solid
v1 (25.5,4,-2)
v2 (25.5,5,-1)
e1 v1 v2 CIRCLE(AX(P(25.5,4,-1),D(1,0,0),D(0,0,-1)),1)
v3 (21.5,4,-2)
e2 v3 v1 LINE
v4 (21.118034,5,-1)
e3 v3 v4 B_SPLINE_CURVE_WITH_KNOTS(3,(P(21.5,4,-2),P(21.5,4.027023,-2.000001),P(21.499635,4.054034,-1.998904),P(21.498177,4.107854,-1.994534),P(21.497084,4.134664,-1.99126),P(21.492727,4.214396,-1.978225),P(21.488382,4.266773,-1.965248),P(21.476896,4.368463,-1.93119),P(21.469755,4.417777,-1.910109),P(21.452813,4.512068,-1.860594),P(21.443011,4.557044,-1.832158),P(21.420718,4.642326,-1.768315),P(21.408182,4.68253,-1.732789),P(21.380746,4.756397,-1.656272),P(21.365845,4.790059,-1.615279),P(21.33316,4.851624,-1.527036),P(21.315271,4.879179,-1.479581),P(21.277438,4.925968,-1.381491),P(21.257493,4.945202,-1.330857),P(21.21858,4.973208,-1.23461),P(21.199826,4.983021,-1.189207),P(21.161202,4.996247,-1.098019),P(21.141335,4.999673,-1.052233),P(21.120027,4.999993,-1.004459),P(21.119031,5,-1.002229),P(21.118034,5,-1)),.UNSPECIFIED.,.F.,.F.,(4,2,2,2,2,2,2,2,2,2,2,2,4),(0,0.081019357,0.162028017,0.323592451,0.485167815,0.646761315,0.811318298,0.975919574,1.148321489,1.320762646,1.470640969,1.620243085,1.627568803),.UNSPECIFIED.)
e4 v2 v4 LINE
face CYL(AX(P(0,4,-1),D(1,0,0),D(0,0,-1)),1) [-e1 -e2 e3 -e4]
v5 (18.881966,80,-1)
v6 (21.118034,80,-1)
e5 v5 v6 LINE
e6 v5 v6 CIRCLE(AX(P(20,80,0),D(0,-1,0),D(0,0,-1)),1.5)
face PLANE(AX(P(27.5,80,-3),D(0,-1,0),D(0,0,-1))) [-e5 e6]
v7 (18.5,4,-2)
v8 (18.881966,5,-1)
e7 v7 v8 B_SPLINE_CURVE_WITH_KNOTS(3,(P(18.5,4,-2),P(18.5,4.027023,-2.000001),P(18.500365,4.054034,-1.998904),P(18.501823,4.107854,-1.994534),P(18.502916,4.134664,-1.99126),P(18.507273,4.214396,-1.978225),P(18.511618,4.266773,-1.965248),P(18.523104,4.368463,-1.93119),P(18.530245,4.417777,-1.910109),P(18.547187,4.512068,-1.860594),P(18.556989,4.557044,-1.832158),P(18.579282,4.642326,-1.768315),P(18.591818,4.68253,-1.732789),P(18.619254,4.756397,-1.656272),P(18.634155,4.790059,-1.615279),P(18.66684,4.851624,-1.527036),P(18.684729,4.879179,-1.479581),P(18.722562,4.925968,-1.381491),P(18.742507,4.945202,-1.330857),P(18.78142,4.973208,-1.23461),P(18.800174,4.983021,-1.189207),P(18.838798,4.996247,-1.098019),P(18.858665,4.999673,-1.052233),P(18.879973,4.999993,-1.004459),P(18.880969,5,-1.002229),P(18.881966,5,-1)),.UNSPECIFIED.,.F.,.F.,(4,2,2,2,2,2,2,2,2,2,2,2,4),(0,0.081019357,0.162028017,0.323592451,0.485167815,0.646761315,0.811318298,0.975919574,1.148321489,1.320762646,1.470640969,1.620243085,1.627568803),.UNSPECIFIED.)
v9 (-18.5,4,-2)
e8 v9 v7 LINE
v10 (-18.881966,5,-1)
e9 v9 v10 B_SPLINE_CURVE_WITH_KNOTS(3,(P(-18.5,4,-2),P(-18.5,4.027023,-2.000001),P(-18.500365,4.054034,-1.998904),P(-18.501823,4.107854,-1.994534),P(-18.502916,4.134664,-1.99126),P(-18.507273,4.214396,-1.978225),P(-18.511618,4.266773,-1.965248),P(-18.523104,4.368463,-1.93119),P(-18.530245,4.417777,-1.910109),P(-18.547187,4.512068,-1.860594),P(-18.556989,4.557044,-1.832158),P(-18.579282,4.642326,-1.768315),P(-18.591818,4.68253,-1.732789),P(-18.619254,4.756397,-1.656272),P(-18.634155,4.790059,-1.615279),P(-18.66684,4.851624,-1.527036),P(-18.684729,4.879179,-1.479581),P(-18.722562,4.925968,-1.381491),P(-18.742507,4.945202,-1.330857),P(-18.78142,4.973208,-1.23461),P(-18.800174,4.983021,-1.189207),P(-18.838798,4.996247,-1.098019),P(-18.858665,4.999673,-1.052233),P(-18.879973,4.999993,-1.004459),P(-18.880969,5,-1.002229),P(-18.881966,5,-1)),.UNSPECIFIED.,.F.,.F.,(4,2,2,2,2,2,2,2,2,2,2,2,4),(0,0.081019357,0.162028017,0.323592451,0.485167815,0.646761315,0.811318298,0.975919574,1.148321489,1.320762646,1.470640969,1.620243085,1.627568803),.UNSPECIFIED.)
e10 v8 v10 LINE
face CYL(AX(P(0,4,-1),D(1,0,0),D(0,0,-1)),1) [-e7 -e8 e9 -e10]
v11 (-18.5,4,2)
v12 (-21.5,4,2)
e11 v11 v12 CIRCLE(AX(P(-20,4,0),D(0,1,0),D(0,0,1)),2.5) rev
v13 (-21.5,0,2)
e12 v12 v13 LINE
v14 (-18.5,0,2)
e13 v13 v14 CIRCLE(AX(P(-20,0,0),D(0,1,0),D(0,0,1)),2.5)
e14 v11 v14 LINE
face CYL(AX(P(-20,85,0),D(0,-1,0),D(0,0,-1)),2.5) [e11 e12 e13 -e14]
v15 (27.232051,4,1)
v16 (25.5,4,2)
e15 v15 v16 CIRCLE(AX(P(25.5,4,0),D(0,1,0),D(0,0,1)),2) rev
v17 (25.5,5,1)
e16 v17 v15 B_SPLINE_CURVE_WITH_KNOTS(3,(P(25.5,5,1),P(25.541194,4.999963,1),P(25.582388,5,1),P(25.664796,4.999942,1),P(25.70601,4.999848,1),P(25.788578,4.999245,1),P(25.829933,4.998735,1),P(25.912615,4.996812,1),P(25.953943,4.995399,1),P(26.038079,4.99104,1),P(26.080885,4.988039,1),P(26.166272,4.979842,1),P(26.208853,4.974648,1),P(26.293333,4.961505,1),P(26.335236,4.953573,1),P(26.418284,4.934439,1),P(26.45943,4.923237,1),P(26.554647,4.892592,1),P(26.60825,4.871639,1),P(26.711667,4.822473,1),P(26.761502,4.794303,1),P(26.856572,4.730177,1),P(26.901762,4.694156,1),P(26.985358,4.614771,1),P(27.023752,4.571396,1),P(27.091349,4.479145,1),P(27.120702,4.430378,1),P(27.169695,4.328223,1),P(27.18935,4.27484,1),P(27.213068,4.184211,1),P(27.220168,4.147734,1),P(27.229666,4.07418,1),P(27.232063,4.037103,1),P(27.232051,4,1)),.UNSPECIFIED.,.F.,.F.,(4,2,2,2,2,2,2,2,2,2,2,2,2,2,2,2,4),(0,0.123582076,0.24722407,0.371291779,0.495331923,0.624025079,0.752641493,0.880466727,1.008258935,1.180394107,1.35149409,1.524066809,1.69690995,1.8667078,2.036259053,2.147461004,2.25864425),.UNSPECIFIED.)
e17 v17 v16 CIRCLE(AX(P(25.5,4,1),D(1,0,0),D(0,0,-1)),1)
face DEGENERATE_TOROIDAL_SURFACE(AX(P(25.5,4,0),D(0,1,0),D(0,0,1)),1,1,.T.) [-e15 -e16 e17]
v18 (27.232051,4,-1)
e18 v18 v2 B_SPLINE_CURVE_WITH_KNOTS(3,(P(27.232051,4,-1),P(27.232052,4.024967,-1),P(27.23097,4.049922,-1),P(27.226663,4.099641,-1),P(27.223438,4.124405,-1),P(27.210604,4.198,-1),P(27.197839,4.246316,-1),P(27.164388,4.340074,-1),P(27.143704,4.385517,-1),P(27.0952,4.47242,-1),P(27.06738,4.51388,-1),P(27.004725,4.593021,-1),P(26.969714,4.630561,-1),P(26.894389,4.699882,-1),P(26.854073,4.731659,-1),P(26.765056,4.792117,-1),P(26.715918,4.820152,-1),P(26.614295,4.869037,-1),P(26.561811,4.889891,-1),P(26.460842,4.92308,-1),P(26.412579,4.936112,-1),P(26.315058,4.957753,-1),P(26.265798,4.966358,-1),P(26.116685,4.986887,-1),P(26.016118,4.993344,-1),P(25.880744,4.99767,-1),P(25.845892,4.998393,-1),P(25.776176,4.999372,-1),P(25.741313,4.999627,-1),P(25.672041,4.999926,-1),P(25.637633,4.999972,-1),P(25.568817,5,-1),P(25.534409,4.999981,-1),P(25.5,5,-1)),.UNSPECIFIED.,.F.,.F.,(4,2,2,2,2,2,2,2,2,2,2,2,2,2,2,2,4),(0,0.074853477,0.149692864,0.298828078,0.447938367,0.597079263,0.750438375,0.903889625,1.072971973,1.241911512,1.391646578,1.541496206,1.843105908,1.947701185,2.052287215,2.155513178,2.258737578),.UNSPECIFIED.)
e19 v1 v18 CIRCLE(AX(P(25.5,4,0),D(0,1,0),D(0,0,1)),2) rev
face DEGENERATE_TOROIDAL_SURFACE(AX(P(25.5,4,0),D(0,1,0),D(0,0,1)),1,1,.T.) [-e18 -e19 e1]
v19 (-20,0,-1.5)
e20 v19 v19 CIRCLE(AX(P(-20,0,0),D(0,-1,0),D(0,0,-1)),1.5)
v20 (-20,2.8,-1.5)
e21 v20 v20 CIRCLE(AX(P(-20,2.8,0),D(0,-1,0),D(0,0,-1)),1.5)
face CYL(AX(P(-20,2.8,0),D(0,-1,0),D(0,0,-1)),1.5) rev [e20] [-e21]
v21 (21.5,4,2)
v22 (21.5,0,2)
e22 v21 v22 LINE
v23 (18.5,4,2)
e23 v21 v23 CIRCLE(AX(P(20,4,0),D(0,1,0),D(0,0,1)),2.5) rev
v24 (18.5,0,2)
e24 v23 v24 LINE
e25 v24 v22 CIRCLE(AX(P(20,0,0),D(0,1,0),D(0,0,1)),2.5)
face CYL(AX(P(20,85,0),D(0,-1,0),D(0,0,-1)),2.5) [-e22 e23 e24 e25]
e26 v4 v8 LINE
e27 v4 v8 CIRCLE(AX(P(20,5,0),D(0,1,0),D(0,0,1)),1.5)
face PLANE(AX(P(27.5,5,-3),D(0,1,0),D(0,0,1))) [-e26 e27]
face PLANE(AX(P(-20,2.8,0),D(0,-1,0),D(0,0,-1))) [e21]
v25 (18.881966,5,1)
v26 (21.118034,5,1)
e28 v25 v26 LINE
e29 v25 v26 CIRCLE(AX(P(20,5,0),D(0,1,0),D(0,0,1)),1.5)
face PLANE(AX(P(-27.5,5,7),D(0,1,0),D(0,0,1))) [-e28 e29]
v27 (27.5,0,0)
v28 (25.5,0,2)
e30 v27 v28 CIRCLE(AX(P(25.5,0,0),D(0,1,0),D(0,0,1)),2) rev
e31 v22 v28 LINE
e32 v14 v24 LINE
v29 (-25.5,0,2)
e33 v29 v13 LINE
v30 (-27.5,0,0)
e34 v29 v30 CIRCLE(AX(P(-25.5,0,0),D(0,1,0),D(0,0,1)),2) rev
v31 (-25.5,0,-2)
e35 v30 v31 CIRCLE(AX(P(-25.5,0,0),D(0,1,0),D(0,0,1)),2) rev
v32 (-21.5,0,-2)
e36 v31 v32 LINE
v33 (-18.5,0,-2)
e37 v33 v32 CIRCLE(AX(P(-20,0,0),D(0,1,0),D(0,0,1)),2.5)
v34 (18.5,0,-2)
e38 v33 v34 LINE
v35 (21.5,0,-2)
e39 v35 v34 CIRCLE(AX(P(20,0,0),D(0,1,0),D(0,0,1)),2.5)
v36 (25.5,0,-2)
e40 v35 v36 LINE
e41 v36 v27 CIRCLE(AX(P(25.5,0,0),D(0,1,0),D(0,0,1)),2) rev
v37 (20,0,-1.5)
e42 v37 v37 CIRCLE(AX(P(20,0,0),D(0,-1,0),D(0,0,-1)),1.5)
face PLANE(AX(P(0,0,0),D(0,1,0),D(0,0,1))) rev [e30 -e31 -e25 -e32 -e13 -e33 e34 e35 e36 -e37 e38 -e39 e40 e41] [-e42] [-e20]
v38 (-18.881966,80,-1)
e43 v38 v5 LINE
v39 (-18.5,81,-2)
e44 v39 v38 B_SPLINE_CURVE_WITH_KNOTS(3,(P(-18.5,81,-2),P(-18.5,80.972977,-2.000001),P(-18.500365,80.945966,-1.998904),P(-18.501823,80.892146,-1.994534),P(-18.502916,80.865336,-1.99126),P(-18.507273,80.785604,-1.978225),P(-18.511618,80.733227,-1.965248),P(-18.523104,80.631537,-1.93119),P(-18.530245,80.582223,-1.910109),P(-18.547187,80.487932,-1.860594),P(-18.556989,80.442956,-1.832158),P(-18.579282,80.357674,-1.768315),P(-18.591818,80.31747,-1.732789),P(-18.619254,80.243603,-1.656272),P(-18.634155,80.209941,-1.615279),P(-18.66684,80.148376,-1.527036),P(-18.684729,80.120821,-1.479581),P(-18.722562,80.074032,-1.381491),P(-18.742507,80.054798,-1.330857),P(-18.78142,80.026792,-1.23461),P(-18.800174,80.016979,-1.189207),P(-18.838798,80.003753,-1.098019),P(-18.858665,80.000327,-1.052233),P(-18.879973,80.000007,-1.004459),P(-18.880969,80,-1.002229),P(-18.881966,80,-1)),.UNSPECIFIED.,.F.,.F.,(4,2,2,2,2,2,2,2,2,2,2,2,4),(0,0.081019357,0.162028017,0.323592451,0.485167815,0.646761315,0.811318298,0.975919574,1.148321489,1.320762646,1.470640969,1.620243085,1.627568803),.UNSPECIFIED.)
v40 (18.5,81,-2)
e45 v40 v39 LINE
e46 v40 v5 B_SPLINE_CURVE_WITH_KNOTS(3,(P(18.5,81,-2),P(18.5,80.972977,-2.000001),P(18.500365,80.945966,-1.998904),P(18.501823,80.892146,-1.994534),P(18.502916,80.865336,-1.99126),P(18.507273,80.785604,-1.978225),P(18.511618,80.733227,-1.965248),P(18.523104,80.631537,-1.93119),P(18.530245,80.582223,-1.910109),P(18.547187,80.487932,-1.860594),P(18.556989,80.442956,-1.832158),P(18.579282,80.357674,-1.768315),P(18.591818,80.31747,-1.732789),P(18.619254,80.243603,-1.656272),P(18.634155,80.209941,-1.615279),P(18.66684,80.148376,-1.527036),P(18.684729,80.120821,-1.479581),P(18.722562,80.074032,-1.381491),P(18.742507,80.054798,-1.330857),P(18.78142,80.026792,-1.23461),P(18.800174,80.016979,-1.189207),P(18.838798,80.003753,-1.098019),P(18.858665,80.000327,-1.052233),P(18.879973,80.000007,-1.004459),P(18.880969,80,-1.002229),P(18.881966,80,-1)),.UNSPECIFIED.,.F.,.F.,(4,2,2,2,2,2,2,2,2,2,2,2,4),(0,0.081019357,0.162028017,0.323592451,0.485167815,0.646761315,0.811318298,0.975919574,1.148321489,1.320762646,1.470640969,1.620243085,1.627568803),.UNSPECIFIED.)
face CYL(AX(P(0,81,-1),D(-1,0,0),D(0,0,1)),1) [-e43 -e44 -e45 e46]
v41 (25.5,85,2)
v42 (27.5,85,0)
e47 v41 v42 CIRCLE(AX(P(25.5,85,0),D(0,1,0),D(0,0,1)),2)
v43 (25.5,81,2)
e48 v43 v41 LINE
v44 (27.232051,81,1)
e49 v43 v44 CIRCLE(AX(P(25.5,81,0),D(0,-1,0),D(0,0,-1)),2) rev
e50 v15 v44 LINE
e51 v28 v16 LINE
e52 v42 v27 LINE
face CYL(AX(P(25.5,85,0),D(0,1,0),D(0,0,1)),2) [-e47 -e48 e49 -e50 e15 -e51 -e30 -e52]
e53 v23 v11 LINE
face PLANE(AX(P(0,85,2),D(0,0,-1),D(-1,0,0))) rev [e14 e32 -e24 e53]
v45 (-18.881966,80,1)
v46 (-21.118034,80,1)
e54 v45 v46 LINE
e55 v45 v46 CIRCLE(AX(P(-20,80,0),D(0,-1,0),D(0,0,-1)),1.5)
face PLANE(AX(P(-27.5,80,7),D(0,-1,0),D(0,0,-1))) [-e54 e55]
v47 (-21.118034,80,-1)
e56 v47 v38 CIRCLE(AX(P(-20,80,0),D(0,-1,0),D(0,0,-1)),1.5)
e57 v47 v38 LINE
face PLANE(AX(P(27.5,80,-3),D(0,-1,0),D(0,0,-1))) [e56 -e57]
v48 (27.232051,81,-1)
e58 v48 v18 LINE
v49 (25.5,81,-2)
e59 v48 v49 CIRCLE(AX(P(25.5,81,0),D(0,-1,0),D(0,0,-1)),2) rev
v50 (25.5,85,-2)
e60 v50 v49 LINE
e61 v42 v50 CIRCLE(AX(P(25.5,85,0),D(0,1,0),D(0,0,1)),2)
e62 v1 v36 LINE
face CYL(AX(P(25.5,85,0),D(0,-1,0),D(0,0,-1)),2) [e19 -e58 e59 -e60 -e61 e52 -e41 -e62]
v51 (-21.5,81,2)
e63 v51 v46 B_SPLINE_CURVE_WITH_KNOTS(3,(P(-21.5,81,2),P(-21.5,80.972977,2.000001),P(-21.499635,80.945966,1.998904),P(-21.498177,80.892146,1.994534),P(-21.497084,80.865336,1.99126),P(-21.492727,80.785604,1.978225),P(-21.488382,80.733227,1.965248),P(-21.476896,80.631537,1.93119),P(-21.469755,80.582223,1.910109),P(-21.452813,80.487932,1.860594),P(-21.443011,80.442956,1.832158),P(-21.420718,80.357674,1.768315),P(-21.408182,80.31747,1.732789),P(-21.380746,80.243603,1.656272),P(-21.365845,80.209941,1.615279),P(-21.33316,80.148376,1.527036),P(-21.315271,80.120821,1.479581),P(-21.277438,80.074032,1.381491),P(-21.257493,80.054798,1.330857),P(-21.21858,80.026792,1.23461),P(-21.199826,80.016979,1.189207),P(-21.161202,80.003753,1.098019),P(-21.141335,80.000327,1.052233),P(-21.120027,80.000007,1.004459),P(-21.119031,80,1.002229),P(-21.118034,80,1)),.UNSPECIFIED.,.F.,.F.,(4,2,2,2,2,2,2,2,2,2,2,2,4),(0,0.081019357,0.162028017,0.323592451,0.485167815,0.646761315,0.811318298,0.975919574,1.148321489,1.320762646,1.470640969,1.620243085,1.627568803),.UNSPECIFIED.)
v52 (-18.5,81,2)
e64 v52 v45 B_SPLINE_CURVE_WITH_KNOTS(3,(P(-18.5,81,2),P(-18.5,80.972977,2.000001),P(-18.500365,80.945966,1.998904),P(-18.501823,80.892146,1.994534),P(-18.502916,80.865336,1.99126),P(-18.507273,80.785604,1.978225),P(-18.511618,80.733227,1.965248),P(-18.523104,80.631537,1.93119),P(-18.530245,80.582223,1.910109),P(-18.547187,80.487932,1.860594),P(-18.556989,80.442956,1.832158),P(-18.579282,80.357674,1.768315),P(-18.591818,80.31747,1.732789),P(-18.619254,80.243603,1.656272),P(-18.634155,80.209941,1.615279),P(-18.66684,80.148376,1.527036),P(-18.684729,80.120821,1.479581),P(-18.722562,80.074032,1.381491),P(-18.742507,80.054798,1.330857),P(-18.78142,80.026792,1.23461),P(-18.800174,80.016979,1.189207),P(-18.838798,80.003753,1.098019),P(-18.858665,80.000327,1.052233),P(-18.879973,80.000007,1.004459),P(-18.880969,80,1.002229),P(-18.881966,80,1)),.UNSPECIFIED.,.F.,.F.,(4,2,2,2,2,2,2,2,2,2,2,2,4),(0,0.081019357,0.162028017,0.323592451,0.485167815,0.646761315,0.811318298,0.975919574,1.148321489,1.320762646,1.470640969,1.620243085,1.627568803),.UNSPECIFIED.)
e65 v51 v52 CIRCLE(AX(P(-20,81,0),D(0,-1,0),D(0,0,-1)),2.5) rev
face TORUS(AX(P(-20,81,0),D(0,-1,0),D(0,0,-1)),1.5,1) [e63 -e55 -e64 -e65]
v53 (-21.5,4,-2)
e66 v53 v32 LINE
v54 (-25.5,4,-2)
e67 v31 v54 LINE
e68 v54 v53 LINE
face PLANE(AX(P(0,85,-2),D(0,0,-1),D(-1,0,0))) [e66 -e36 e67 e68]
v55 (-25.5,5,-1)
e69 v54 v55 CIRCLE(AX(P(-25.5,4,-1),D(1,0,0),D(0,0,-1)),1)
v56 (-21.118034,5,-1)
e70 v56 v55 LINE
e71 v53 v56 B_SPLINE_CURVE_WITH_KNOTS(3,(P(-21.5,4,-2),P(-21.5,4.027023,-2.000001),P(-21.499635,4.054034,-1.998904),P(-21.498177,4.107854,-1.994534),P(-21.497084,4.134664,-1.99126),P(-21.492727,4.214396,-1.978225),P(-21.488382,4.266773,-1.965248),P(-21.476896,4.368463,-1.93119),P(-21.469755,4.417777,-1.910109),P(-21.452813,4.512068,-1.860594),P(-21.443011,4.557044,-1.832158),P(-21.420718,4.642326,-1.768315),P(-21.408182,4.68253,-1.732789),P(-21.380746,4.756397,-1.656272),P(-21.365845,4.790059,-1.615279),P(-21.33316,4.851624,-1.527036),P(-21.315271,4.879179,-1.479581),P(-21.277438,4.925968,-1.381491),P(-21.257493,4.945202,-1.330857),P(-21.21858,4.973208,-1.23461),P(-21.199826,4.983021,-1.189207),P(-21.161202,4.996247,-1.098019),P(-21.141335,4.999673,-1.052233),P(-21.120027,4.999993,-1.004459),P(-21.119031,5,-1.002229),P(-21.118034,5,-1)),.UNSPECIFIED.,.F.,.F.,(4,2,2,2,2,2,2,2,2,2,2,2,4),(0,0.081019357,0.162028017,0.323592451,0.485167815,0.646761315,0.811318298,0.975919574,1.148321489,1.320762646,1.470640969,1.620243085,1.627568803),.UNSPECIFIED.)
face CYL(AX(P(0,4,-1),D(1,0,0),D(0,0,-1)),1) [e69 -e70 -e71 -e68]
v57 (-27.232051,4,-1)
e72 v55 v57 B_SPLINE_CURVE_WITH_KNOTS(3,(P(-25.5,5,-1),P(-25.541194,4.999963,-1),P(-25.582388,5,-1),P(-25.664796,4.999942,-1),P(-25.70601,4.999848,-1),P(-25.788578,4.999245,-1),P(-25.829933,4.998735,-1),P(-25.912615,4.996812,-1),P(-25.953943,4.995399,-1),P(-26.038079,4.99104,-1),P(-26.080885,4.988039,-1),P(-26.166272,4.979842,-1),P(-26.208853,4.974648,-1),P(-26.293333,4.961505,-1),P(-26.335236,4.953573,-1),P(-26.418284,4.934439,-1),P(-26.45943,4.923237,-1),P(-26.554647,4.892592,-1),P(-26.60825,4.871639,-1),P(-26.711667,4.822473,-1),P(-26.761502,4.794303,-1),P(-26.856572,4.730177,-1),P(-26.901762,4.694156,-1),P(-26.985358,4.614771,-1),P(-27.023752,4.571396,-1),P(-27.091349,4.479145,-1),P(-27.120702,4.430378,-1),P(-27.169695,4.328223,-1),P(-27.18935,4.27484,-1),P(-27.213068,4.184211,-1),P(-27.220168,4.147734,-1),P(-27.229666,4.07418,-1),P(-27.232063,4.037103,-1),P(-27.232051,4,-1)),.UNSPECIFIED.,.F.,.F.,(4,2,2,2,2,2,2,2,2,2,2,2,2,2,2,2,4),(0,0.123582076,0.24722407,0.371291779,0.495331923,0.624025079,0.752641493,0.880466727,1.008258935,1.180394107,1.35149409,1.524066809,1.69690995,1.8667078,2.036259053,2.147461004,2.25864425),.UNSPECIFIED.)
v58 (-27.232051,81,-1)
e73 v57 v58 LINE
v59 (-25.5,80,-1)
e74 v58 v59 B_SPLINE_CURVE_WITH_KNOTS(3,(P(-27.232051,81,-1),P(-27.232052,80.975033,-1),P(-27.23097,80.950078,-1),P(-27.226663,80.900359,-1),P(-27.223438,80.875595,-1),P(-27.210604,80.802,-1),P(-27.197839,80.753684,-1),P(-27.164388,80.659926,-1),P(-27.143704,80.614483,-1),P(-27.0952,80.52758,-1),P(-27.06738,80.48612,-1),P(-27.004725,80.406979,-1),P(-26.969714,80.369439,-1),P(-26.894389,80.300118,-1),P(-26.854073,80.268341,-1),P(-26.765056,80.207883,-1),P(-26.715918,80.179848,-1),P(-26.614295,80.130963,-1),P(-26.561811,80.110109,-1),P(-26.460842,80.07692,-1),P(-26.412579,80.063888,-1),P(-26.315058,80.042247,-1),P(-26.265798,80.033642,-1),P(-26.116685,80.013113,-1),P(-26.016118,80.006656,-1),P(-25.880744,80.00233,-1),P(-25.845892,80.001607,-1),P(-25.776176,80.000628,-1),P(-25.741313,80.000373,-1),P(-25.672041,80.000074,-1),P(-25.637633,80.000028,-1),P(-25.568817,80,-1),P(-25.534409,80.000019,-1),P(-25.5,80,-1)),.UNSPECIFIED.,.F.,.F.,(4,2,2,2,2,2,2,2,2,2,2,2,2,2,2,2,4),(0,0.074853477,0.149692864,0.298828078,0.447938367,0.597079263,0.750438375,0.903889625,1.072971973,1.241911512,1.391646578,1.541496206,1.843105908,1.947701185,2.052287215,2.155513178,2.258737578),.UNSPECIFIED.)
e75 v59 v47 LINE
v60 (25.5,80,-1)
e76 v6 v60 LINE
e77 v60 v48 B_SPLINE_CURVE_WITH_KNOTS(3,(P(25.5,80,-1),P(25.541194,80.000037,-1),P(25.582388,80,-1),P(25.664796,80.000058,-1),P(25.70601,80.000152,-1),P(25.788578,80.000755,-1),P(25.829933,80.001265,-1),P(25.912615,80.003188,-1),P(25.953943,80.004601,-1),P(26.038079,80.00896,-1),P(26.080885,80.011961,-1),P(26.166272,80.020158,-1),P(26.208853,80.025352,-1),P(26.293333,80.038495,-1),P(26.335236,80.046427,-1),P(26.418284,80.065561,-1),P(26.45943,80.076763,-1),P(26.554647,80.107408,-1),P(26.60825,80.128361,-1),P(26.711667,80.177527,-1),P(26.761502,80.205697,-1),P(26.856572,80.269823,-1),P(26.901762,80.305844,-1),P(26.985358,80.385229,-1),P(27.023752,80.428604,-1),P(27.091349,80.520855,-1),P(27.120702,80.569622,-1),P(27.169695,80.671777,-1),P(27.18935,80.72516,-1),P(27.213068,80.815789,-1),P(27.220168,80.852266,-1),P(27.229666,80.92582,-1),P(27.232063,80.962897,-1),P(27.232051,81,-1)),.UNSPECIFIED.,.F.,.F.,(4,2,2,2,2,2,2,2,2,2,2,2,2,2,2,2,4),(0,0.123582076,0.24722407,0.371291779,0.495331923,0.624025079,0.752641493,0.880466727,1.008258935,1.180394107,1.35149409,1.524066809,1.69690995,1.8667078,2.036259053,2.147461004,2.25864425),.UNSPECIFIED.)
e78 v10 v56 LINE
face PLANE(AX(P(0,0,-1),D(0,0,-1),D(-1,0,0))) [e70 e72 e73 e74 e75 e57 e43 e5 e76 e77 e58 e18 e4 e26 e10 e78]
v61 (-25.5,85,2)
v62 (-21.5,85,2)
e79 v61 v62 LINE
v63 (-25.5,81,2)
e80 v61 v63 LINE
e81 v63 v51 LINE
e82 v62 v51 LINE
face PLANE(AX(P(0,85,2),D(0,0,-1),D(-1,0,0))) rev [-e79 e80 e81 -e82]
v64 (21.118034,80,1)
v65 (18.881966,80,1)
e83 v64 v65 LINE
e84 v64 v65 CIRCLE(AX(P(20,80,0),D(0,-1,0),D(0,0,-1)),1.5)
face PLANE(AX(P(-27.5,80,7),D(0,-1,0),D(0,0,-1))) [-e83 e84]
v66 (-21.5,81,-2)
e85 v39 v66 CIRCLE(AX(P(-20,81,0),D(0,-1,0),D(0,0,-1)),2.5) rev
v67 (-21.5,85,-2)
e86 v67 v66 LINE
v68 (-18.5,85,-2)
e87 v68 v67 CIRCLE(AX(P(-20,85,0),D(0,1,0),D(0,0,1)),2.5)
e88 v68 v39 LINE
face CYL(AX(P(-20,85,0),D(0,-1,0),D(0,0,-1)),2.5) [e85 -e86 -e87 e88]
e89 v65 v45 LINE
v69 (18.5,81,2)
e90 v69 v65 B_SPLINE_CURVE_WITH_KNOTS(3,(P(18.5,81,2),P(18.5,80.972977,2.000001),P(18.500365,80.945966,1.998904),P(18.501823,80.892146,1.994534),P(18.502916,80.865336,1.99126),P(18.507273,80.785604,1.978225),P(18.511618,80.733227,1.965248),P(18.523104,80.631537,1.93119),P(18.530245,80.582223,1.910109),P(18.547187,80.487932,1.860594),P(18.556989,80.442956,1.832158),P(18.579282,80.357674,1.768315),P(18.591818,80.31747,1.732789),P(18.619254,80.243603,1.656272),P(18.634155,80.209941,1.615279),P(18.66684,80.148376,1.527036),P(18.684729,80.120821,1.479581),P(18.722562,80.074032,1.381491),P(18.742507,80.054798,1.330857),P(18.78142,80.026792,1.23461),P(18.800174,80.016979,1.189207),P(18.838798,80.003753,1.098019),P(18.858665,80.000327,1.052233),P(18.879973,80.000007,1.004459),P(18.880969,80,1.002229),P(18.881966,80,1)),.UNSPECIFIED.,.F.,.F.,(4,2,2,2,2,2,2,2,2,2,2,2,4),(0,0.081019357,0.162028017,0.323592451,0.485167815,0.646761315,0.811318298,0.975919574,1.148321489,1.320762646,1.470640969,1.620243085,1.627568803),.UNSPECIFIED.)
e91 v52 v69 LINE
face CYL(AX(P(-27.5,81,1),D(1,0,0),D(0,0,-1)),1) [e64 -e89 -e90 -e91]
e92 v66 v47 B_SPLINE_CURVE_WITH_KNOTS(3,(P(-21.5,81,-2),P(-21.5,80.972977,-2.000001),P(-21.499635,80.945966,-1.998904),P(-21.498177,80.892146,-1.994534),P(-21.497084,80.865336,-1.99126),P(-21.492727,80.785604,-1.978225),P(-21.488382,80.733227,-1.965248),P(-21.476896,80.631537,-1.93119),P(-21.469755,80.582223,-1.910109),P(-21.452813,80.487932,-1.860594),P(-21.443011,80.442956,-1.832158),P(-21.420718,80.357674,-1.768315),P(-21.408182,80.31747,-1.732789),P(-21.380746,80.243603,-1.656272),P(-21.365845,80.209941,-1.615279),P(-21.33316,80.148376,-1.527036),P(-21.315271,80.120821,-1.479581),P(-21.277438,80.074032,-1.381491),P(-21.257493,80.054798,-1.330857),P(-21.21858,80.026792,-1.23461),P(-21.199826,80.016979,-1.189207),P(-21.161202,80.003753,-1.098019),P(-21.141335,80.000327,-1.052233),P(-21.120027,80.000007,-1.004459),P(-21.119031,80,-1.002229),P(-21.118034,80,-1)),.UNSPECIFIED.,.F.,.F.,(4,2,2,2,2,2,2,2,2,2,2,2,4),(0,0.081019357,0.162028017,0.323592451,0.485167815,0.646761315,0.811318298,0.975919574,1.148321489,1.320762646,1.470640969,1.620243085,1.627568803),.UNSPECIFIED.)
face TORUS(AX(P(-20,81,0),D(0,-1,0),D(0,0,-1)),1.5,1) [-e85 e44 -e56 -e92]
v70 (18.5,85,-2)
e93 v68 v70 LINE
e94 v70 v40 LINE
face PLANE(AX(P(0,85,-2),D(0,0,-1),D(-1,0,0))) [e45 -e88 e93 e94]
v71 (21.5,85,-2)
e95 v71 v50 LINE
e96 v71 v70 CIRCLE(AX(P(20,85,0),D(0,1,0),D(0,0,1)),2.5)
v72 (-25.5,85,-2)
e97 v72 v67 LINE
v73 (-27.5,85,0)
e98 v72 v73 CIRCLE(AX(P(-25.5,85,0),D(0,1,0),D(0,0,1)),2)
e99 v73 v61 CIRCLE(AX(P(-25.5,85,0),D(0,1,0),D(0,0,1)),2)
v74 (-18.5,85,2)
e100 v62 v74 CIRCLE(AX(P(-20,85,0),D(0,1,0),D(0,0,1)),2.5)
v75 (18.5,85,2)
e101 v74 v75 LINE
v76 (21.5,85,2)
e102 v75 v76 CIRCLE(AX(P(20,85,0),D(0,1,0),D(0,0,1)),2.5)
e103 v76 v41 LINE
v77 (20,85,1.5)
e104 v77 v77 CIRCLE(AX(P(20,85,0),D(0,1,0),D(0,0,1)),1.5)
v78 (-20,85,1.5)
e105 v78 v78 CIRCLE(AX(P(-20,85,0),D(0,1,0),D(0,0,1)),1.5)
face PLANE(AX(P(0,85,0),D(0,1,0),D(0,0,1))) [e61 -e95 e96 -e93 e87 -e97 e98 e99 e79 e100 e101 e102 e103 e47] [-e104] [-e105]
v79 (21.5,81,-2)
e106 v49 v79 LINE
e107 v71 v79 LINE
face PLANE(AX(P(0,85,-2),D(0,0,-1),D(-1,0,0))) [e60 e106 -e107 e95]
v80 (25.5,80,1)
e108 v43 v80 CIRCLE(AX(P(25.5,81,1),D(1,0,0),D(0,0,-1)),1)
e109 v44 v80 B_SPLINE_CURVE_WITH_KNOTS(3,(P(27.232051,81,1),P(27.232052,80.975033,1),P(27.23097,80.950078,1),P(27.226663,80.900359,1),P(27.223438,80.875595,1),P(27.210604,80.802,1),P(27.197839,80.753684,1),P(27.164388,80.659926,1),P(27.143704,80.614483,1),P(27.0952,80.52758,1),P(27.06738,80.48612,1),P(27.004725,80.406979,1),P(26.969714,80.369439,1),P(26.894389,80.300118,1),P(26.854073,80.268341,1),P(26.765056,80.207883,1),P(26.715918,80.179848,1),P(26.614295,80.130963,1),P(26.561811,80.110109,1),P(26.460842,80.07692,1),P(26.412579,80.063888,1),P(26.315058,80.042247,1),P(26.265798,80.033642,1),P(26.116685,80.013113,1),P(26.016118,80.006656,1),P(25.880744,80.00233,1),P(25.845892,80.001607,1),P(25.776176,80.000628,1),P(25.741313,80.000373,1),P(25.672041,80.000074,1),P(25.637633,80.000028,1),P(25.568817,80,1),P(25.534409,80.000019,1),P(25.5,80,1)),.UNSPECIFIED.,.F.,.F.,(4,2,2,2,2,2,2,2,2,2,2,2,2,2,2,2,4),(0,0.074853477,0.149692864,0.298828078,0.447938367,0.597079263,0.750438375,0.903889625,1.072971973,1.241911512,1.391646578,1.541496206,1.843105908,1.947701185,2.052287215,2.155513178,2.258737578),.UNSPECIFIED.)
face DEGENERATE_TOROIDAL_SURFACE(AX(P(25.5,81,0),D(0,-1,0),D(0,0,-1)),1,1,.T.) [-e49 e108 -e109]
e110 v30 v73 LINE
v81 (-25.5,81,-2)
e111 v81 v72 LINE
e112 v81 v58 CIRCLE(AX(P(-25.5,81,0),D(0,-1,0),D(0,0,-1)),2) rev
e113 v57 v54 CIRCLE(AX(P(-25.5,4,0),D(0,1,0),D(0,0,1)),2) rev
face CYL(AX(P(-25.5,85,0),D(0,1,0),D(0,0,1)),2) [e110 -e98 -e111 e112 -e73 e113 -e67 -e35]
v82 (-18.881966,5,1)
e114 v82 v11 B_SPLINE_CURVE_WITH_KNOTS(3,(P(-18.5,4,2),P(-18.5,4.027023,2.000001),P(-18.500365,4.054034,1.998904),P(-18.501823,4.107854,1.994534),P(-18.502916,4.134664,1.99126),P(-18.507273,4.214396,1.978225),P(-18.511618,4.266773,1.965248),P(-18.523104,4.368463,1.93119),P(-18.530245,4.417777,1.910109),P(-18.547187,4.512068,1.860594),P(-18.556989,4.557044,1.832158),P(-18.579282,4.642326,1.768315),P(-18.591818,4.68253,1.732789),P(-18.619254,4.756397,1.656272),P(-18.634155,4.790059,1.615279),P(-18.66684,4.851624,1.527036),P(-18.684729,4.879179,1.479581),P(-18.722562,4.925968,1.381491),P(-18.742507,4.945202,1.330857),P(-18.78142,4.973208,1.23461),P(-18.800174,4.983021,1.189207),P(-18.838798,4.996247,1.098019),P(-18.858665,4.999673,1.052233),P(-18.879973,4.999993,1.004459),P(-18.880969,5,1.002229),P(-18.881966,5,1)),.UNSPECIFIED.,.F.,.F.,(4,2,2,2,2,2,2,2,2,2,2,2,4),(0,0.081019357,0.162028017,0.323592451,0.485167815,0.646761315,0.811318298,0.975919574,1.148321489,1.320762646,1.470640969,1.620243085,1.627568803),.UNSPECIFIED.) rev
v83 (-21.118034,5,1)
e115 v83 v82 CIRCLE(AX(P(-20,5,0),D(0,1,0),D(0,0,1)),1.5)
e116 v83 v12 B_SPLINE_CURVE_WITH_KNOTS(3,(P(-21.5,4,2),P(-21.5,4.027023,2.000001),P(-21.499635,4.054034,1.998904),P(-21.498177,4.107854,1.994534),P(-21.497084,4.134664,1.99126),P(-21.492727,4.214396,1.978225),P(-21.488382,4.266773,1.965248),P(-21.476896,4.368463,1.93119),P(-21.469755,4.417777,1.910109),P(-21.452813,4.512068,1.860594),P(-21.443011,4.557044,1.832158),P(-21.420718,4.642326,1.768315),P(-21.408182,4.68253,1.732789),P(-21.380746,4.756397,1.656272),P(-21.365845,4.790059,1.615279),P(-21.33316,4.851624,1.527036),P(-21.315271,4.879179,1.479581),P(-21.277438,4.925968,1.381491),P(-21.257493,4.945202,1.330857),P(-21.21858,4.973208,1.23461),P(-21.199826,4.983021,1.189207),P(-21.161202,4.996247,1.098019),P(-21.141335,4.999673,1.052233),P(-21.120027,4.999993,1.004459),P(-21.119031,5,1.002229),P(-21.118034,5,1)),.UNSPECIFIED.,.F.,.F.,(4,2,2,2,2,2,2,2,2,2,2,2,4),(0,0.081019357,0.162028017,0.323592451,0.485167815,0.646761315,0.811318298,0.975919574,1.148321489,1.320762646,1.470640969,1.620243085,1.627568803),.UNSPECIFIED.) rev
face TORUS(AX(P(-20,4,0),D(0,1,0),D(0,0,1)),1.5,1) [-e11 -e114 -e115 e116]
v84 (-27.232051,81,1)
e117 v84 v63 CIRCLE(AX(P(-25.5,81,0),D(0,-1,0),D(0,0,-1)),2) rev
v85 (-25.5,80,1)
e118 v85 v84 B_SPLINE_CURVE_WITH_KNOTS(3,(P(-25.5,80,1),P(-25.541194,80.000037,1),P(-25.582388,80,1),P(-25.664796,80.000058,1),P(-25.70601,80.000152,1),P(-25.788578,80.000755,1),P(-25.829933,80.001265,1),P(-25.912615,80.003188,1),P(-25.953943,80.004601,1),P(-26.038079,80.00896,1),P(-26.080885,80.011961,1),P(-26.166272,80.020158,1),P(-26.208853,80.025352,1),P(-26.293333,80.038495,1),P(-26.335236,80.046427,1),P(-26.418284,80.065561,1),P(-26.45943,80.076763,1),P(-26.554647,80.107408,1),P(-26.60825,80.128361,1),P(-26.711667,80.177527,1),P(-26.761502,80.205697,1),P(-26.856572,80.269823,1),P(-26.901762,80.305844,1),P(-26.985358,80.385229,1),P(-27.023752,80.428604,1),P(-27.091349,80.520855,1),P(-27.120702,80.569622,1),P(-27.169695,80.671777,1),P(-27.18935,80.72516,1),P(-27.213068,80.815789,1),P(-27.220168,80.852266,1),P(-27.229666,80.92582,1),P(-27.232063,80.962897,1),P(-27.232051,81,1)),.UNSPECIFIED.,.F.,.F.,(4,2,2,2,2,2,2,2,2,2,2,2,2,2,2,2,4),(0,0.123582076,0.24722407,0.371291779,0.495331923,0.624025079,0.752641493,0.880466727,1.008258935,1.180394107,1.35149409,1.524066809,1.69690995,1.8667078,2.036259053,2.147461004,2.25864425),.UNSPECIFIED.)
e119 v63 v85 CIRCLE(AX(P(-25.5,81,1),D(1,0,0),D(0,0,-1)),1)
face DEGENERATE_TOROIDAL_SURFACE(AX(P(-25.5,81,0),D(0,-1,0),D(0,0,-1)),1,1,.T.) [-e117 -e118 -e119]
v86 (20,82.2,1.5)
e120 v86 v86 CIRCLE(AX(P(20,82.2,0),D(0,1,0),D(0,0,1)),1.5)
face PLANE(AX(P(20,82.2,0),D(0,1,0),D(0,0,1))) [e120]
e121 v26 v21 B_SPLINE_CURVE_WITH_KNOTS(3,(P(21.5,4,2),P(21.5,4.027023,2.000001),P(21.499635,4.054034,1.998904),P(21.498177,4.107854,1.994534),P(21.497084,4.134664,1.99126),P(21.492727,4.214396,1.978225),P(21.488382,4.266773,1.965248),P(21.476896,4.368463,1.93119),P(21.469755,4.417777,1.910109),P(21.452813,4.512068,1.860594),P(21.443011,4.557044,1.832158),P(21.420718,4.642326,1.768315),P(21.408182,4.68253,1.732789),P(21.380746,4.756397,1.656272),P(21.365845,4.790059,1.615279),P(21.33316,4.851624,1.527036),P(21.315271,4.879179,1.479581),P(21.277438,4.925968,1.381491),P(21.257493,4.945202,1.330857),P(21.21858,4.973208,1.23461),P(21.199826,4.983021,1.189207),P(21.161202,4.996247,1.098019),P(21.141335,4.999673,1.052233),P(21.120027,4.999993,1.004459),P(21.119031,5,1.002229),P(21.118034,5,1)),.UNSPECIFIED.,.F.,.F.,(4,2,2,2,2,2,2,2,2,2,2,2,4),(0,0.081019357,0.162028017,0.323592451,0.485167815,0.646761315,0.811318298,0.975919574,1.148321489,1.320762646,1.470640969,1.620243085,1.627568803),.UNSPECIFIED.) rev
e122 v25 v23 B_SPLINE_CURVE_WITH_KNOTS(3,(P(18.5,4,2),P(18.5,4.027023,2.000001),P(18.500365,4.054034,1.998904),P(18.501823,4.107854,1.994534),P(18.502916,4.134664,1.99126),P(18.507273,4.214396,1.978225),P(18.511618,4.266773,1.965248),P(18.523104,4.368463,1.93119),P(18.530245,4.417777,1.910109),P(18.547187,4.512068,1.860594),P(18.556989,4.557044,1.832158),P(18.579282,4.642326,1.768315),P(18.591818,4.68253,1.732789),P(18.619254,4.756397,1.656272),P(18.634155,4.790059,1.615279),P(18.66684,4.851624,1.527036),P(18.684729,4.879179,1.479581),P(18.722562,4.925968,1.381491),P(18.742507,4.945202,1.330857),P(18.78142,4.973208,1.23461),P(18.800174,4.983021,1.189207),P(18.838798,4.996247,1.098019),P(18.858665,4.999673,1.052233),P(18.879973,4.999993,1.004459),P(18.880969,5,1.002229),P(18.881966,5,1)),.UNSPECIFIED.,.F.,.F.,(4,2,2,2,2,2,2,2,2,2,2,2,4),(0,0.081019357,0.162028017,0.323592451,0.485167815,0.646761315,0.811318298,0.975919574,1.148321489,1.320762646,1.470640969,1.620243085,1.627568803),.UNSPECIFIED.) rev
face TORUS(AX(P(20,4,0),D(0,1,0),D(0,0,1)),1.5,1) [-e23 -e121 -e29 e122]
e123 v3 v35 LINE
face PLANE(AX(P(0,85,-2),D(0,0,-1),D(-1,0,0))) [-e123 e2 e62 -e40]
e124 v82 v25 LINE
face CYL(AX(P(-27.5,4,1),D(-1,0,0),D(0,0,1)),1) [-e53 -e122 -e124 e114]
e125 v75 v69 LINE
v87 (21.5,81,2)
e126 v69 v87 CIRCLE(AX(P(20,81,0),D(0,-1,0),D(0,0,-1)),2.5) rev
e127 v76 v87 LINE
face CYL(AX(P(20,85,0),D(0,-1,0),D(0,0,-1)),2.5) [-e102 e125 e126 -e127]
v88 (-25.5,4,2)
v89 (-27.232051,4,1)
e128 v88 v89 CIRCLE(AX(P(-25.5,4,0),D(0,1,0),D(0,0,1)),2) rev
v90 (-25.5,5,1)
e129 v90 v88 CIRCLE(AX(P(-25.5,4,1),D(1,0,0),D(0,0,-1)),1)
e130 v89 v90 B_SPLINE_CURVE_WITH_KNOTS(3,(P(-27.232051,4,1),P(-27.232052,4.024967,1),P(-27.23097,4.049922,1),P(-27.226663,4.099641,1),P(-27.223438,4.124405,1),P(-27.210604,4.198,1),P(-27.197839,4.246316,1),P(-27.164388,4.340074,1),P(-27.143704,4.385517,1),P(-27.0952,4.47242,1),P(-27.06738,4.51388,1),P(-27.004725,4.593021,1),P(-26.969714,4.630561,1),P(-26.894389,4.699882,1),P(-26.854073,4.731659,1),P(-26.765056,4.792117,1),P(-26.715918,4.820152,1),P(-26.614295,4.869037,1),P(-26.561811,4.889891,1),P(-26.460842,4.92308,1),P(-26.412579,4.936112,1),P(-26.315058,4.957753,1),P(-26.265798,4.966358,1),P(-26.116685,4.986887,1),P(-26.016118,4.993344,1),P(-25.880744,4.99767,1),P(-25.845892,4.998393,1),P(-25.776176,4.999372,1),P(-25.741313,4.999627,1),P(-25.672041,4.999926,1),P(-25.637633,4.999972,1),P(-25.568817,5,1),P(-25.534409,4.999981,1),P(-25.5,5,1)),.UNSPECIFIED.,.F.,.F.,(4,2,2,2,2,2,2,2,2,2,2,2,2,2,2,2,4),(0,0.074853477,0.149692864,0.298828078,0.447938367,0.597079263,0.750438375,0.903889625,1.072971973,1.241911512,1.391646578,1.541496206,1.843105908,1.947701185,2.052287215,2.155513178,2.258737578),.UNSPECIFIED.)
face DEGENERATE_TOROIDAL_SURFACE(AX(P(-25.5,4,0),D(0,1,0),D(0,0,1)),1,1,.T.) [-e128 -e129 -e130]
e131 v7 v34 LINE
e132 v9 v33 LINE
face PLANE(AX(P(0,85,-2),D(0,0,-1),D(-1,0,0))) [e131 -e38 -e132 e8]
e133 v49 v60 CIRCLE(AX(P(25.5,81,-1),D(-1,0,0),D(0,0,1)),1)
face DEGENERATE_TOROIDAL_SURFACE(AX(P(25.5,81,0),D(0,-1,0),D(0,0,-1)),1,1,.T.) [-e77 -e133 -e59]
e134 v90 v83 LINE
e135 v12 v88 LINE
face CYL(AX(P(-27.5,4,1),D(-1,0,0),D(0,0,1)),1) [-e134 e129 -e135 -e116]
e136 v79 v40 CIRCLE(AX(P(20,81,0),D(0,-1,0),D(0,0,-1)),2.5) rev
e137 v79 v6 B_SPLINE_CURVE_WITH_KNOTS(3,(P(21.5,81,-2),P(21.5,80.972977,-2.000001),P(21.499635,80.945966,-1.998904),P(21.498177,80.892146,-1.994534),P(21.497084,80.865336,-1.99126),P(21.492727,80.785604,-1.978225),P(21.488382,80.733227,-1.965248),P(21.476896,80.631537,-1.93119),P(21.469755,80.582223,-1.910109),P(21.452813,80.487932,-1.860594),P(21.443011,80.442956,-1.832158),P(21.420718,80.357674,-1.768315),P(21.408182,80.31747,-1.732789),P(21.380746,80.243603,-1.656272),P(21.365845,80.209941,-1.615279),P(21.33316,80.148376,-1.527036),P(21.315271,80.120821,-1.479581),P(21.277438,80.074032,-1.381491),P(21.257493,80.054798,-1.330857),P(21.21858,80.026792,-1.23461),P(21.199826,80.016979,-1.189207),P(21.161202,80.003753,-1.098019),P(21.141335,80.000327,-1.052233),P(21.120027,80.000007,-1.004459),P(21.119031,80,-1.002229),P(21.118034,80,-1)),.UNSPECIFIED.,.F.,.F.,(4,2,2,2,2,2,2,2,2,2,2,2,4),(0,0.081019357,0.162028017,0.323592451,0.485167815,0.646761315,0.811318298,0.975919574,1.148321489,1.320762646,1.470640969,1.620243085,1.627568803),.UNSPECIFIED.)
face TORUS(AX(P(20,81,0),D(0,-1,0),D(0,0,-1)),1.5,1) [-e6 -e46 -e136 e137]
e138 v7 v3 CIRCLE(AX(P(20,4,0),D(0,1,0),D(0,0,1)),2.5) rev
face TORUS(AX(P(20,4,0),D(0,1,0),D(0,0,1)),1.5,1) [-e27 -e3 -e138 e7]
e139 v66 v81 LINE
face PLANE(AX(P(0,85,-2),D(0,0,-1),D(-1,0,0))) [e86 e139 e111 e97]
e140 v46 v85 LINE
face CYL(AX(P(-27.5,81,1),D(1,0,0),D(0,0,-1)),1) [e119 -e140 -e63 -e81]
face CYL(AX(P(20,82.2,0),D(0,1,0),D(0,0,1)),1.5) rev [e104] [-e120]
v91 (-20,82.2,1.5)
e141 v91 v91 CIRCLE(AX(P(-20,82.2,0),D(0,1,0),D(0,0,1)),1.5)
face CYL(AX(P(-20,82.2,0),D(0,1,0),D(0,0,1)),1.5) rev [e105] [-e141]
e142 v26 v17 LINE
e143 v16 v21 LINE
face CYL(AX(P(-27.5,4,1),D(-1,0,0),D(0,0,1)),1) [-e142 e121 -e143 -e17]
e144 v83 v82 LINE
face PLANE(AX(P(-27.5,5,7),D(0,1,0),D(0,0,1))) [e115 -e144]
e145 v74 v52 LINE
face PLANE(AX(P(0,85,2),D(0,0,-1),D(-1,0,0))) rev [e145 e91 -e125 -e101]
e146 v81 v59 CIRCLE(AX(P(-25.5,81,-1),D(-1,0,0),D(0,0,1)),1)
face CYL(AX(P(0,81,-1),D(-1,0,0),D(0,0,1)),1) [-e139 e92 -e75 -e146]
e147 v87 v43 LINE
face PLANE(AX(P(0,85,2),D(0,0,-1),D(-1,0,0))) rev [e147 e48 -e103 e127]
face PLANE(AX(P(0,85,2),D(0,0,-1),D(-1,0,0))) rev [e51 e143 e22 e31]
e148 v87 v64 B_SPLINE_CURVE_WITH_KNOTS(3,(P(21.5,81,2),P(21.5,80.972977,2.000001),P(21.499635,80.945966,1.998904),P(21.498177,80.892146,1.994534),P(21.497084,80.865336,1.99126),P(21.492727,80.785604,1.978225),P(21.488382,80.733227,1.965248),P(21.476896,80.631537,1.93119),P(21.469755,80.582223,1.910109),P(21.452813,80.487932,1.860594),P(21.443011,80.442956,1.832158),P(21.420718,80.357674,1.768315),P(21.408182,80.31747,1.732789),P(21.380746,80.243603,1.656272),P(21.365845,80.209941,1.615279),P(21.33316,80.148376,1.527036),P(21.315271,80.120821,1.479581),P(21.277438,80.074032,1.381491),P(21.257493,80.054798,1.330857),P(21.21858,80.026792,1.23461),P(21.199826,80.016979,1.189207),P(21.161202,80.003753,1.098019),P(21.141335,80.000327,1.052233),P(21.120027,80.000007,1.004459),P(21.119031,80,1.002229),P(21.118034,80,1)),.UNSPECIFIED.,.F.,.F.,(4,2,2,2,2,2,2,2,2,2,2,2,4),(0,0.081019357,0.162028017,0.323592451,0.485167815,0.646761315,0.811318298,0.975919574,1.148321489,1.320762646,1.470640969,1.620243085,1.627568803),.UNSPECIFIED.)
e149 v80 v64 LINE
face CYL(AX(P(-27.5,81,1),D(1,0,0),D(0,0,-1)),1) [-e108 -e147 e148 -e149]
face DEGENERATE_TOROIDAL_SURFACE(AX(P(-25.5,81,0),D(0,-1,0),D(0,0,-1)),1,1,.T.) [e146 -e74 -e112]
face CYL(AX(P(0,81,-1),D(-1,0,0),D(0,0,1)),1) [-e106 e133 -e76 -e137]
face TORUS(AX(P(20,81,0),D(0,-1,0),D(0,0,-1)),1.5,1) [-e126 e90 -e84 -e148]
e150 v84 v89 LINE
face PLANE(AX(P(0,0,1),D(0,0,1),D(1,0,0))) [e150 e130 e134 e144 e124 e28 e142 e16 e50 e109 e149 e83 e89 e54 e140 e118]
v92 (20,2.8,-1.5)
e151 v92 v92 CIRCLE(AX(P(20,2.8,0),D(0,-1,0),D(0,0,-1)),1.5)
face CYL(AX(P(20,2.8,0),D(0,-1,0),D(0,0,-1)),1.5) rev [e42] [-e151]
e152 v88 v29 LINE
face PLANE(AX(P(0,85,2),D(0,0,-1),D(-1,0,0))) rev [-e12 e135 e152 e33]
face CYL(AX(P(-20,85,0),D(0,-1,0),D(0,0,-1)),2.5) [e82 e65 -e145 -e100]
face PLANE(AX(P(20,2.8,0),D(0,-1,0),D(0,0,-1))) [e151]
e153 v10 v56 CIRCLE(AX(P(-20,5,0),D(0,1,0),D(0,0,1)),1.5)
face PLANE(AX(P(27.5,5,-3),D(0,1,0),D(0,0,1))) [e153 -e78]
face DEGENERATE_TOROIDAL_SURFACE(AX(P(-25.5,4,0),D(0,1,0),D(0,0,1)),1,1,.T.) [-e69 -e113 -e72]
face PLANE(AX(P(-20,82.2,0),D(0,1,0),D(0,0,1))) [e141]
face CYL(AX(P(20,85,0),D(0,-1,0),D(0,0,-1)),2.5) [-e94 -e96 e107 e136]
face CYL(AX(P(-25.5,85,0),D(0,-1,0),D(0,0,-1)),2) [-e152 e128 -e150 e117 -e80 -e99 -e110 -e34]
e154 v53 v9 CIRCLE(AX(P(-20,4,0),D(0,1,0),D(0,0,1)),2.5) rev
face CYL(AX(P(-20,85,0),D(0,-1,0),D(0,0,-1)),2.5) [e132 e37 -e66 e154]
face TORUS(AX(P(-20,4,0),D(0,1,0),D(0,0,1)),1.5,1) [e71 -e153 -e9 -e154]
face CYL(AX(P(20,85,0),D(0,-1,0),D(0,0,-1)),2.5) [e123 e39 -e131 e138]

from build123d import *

# Parameters (mm, degrees)
BOSS_EXTRUDE1_DEPTH     = 85
SKETCH2_R               = 1.5000000000000007
CUT_EXTRUDE1_DEPTH      = 2.8
CUT_EXTRUDE2_START      = -2.8
SKETCH3_R               = 1.5000000000000007
CUT_EXTRUDE2_DEPTH      = 2.8
CUT_EXTRUDE3_DEPTH      = 5
CUT_EXTRUDE3_DEPTH_BACK = 1
CUT_EXTRUDE4_DEPTH      = 1
CUT_EXTRUDE4_DEPTH_BACK = 1
FILLET1_R               = 2
FILLET2_R               = 1


with BuildPart() as part:
    # Sketch1 → Boss-Extrude1 (new body)
    with BuildSketch(Plane(origin=(0, 0, 0), x_dir=(1, 0, 0), z_dir=(0, 1, 0))):
        with BuildLine():
            Line((-18.500000000000032, 1.9999999999999996), (-21.500000000000068, 1.9999999999999996))
            ThreePointArc((-21.500000000000053, 1.9999999999999463), (-22.499999999999986, -1.91e-15), (-21.50000000000005, -1.9999999999999476))
            Line((-21.500000000000064, -2.0000000000000004), (-18.500000000000036, -2.0000000000000004))
            ThreePointArc((-18.50000000000003, -2.0000000000000226), (-17.763932022500214, -1.1180339887499129), (-17.499999999999993, -6.1e-16))
            ThreePointArc((-17.499999999999993, 0), (-17.763932022500214, 1.1180339887499113), (-18.500000000000025, 2.0000000000000213))
        make_face()
        with BuildLine():
            ThreePointArc((-18.500000000000025, 2.000000000000021), (-20.00000000000005, 2.4999999999999947), (-21.500000000000053, 1.9999999999999463))
            Line((-21.500000000000068, 1.9999999999999996), (-18.500000000000032, 1.9999999999999996))
        make_face()
        with BuildLine():
            Line((-18.500000000000036, -2.0000000000000004), (-21.500000000000064, -2.0000000000000004))
            ThreePointArc((-21.50000000000005, -1.9999999999999476), (-20.000000000000053, -2.4999999999999947), (-18.50000000000003, -2.0000000000000226))
        make_face()
        with BuildLine():
            Line((-21.500000000000068, 1.9999999999999996), (-27.49999999999999, 1.9999999999999996))
            Line((-27.49999999999999, 1.9999999999999996), (-27.49999999999999, -2.0000000000000004))
            Line((-27.49999999999999, -2.0000000000000004), (-21.500000000000064, -2.0000000000000004))
            ThreePointArc((-21.50000000000005, -1.9999999999999476), (-22.499999999999986, -1.91e-15), (-21.500000000000053, 1.9999999999999463))
        make_face()
        with BuildLine():
            Line((18.49999999999991, 1.9999999999999996), (-18.500000000000032, 1.9999999999999996))
            ThreePointArc((-18.500000000000025, 2.0000000000000213), (-17.763932022500214, 1.1180339887499113), (-17.499999999999993, 0))
            ThreePointArc((-17.499999999999993, -6.1e-16), (-17.763932022500214, -1.1180339887499129), (-18.50000000000003, -2.0000000000000226))
            Line((-18.500000000000036, -2.0000000000000004), (18.499999999999925, -2.0000000000000004))
            ThreePointArc((18.499999999999932, -1.9999999999999478), (17.5, -1.91e-15), (18.49999999999993, 1.9999999999999456))
        make_face()
        with BuildLine():
            ThreePointArc((21.49999999999997, 2.00000000000002), (19.99999999999994, 2.4999999999999982), (18.49999999999993, 1.9999999999999456))
            Line((18.49999999999991, 1.9999999999999996), (21.499999999999968, 1.9999999999999996))
        make_face()
        with BuildLine():
            Line((21.499999999999968, 1.9999999999999996), (18.49999999999991, 1.9999999999999996))
            ThreePointArc((18.49999999999993, 1.9999999999999456), (17.5, -1.91e-15), (18.499999999999932, -1.9999999999999478))
            Line((18.49999999999992, -2.0000000000000004), (21.499999999999954, -2.0000000000000004))
            ThreePointArc((21.499999999999964, -2.0000000000000244), (22.23606797749978, -1.1180339887499124), (22.5, -6.1e-16))
            ThreePointArc((22.5, 0), (22.23606797749978, 1.11803398874991), (21.49999999999997, 2.00000000000002))
        make_face()
        with BuildLine():
            Line((21.499999999999954, -2.0000000000000004), (18.49999999999992, -2.0000000000000004))
            ThreePointArc((18.499999999999932, -1.9999999999999478), (19.999999999999936, -2.4999999999999982), (21.499999999999964, -2.0000000000000244))
        make_face()
        with BuildLine():
            Line((27.50000000000001, 1.9999999999999996), (21.499999999999968, 1.9999999999999996))
            ThreePointArc((21.49999999999997, 2.00000000000002), (22.23606797749978, 1.11803398874991), (22.5, 0))
            ThreePointArc((22.5, -6.1e-16), (22.23606797749978, -1.1180339887499124), (21.499999999999964, -2.0000000000000244))
            Line((21.499999999999954, -2.0000000000000004), (27.50000000000001, -2.0000000000000004))
            Line((27.50000000000001, -2.0000000000000004), (27.50000000000001, 1.9999999999999996))
        make_face()
    extrude(amount=BOSS_EXTRUDE1_DEPTH)

    # Sketch2 → Cut-Extrude1 (cut)
    with BuildSketch(Plane(origin=(0, 85, 0), x_dir=(1, 0, 0), z_dir=(0, 1, 0))):
        with Locations(Location((-19.99999999999999, 0, 0), (0, 0, 270))):
            Circle(SKETCH2_R)
        with Locations(Location((20, 0, 0), (0, 0, 270))):
            Circle(SKETCH2_R)
    extrude(amount=-CUT_EXTRUDE1_DEPTH, mode=Mode.SUBTRACT)

    # Sketch3 → Cut-Extrude2 (cut)
    with BuildSketch(Plane.XZ.offset(CUT_EXTRUDE2_START)):
        with Locations(Location((-19.99999999999999, 0, 0), (0, 0, 90))):
            Circle(SKETCH3_R)
        with Locations(Location((20, 0, 0), (0, 0, 90))):
            Circle(SKETCH3_R)
    extrude(amount=CUT_EXTRUDE2_DEPTH, mode=Mode.SUBTRACT)

    # Sketch4 → Cut-Extrude3 (cut, two sides: drawn at the far end of the back side and taken through both)
    with BuildSketch(Plane.XY.offset(2.0000000000000004).offset(-CUT_EXTRUDE3_DEPTH_BACK)):
        Polygon((-27.500000000000018, 80), (27.500000000000007, 80), (27.50000000000001, 4.999999999999997), (-27.50000000000001, 4.999999999999997), align=None)
    extrude(amount=CUT_EXTRUDE3_DEPTH + CUT_EXTRUDE3_DEPTH_BACK, mode=Mode.SUBTRACT)

    # Sketch5 → Cut-Extrude4 (cut, two sides: drawn at the far end of the back side and taken through both)
    with BuildSketch(Plane(origin=(0, 0, -1.9999999999999996), x_dir=(-1, 0, 0), z_dir=(0, 0, -1)).offset(-CUT_EXTRUDE4_DEPTH_BACK)):
        Polygon((-27.49999999999999, 80.00000000000001), (27.49999999999999, 80.00000000000001), (27.49999999999999, 5.0000000000000115), (-27.499999999999982, 5.0000000000000115), align=None)
    extrude(amount=CUT_EXTRUDE4_DEPTH + CUT_EXTRUDE4_DEPTH_BACK, mode=Mode.SUBTRACT)

    # Fillet1
    fillet1_edges = [part.edges().sort_by_distance(p)[0] for p in [
        (-27.49999999999999, 82.5, 2.0000000000000004),
    ]]
    fillet(fillet1_edges, radius=FILLET1_R)
    fillet1_2_edges = [part.edges().sort_by_distance(p)[0] for p in [
        (-27.49999999999999, 2.5000000000000058, -1.9999999999999996),
    ]]
    fillet(fillet1_2_edges, radius=FILLET1_R - 0.0004)  # a hair under: the kernel refuses the full size
    fillet1_3_edges = [part.edges().sort_by_distance(p)[0] for p in [
        (27.50000000000001, 82.5, 2.0000000000000004),
    ]]
    fillet(fillet1_3_edges, radius=FILLET1_R)
    fillet1_4_edges = [part.edges().sort_by_distance(p)[0] for p in [
        (27.50000000000001, 2.5000000000000058, -1.9999999999999996),
    ]]
    fillet(fillet1_4_edges, radius=FILLET1_R - 0.0004)  # a hair under: the kernel refuses the full size

    # Fillet2
    fillet2_edges = [part.edges().sort_by_distance(p)[0] for p in [
        (-19.999999999999986, 80.00000000000001, -2.499999999999992),
        (19.999999999999996, 80.00000000000001, -2.500000000000009),
        (19.999999999999996, 5.0000000000000115, -2.500000000000009),
        (-19.999999999999986, 5.0000000000000115, -2.499999999999992),
        (-5.684e-14, 80.00000000000001, -1.9999999999999996),
        (23.50019999999999, 5.0000000000000115, -1.9999999999999996),
        (-5.329e-14, 5.0000000000000115, -1.9999999999999996),
        (23.500200169244646, 80.00000000000001, -1.9999999999999996),
        (-26.5002999949995, 80.00000000000001, -1.7320466614179624),
        (26.50030014156478, 80.00000000000001, -1.7320465767871778),
        (-23.500200000000024, 5.0000000000000115, -1.9999999999999996),
        (-26.500299994999484, 5.0000000000000115, -1.7320466614179728),
        (26.500299994999494, 5.0000000000000115, -1.7320466614179786),
        (-23.500000000000025, 4.999999999999997, 2.0000000000000004),
        (-26.49999999999999, 5, 1.7320508075688776),
        (26.500000103238282, 5, 1.7320507479642298),
        (23.499999999999982, 80, 2.0000000000000004),
        (-26.499999999999982, 80, 1.7320508075688823),
        (26.50000000000001, 80, 1.732050807568878),
        (-20.000000000000053, 80, 2.4999999999999925),
        (-23.50000000000002, 80, 2.0000000000000004),
        (19.999999999999932, 80, 2.499999999999999),
        (-5.329e-14, 80, 2.0000000000000004),
        (-20.000000000000053, 4.999999999999997, 2.4999999999999925),
        (-5.507e-14, 4.999999999999997, 2.0000000000000004),
        (19.999999999999932, 4.999999999999997, 2.499999999999999),
        (23.500000119209272, 4.999999999999997, 2.0000000000000004),
        (-23.500200000000024, 80.00000000000001, -1.9999999999999996),
    ]]
    fillet(fillet2_edges, radius=FILLET2_R - 0.0001)  # a hair under: the kernel refuses the full size


solid = part.part
